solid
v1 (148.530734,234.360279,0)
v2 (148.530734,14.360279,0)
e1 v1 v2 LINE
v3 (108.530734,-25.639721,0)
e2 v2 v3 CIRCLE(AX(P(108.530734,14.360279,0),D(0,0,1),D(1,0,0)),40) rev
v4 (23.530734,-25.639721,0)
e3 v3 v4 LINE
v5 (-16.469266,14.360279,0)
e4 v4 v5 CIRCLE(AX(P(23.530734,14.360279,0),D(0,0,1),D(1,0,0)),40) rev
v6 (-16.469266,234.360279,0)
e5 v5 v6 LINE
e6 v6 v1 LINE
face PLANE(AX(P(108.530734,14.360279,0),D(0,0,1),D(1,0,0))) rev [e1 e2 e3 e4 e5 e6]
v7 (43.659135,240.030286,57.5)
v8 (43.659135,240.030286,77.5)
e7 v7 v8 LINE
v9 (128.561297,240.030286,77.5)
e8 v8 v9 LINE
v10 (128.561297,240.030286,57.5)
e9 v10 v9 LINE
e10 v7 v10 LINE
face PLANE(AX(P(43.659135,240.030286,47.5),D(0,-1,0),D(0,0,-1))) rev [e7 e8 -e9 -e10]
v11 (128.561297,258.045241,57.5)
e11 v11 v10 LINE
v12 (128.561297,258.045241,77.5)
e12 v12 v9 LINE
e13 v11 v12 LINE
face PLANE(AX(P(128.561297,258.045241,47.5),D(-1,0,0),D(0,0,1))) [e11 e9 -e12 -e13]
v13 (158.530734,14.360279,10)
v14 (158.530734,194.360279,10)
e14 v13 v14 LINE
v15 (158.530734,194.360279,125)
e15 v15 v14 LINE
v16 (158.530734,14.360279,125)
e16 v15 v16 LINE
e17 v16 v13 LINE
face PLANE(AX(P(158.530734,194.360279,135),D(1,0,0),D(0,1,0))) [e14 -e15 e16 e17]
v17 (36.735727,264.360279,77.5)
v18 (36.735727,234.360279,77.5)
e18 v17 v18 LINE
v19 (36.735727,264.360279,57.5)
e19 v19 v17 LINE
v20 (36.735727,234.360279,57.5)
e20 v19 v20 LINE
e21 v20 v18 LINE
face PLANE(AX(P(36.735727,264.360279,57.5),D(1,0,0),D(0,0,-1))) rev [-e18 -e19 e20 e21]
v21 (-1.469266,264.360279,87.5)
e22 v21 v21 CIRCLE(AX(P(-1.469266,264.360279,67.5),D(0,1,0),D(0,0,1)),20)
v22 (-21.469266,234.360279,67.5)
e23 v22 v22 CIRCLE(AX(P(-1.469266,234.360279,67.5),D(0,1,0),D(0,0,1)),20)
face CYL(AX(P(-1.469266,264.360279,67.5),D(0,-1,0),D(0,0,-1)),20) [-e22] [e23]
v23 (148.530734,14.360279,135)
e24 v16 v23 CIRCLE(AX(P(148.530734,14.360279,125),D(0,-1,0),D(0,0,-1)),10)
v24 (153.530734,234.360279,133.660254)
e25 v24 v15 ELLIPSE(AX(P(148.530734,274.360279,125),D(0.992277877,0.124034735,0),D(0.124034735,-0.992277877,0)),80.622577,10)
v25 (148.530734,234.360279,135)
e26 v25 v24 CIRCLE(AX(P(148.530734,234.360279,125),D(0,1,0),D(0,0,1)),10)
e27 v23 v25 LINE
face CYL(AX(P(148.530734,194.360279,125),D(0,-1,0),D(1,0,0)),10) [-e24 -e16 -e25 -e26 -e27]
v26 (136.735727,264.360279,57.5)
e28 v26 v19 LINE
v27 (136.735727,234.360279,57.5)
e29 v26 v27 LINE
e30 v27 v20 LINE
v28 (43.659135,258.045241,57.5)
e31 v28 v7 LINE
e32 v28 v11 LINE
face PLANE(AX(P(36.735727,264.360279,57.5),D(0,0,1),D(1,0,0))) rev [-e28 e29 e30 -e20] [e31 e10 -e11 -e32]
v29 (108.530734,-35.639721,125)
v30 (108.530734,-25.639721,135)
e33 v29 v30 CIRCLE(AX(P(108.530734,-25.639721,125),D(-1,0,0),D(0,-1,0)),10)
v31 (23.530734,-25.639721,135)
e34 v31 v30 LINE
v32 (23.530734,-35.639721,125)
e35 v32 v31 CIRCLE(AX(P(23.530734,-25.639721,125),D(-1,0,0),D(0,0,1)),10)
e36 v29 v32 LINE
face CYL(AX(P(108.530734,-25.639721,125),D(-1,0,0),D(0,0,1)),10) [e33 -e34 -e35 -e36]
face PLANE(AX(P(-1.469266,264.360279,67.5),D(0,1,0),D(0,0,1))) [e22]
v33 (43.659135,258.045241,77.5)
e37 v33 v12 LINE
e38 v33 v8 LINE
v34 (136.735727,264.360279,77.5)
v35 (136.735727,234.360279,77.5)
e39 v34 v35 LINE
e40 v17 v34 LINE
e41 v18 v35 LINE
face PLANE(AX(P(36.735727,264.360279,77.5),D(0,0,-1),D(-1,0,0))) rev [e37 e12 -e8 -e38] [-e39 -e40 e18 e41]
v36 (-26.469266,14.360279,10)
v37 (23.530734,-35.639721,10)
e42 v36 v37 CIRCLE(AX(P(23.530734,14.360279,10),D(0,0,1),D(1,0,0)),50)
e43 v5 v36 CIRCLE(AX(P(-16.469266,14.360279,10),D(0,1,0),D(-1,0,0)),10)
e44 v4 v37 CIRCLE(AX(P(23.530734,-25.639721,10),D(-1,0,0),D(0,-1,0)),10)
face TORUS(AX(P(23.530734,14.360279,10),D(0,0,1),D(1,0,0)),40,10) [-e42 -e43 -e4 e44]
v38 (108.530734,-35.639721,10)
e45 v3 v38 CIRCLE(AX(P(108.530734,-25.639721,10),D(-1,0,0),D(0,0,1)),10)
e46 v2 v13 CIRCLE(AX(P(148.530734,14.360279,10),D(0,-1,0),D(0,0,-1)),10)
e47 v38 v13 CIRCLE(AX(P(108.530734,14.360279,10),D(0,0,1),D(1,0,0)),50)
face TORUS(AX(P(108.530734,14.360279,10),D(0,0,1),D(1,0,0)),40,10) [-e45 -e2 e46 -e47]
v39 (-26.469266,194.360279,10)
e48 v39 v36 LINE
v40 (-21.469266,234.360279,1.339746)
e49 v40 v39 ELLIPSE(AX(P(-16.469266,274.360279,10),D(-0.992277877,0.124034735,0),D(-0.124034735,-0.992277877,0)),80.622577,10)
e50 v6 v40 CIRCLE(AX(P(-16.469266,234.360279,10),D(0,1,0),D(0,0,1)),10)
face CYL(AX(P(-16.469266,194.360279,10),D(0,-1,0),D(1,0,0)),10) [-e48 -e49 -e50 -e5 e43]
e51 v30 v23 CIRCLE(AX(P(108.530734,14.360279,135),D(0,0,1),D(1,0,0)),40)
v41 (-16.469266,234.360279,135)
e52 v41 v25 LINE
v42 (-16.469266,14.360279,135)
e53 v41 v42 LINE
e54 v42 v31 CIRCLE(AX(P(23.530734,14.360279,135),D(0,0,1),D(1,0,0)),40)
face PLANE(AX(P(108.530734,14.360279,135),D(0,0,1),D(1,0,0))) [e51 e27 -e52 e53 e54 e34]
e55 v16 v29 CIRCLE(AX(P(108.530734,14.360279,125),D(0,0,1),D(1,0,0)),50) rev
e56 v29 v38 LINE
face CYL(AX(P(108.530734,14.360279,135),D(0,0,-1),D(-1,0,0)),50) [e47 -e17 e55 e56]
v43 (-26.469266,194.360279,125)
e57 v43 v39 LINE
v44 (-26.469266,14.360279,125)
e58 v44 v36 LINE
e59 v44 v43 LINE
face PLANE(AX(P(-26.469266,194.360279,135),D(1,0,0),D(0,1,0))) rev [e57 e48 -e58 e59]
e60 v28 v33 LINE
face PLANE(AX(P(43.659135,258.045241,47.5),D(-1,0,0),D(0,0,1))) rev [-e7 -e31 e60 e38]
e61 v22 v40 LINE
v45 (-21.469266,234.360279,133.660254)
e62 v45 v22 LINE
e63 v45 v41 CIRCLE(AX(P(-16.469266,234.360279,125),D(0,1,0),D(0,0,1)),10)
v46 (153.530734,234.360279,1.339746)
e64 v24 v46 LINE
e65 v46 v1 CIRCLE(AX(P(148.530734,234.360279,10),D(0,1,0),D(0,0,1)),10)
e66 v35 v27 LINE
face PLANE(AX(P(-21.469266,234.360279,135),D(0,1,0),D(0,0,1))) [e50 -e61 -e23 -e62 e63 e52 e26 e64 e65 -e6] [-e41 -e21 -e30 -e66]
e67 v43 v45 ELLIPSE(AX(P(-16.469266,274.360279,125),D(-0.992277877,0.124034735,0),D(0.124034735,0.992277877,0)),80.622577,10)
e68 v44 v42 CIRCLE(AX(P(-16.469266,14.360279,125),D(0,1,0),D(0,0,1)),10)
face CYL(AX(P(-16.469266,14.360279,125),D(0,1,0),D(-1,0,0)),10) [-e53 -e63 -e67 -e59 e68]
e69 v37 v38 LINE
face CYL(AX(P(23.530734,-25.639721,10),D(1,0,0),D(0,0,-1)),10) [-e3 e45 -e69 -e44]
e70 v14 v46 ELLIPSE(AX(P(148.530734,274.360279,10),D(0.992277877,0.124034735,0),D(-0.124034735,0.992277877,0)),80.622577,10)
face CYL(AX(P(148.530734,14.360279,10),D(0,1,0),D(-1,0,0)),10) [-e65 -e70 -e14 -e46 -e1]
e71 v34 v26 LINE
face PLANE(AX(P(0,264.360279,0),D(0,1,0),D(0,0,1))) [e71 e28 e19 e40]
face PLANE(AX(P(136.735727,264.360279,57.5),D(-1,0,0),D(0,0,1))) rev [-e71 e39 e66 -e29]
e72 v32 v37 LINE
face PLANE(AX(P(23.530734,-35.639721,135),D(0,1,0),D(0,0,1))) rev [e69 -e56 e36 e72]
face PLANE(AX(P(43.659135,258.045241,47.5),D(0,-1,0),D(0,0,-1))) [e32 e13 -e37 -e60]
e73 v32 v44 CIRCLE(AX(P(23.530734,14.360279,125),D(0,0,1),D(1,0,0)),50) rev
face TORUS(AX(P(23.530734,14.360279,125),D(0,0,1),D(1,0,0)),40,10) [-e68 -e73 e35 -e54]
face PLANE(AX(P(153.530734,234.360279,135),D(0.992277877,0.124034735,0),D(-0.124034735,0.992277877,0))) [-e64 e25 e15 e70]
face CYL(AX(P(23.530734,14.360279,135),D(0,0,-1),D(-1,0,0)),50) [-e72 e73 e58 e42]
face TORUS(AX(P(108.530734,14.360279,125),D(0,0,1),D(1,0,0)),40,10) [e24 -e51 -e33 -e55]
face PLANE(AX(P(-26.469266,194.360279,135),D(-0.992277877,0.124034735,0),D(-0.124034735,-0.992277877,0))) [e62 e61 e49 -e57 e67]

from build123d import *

# Parameters (mm, degrees)
BOSS_EXTRUDE2_DEPTH = 135
SKETCH2_R           = 20
SKETCH2_W           = 100
SKETCH2_H           = 20
BOSS_EXTRUDE3_DEPTH = 30
SKETCH3_W           = 84.902161113
SKETCH3_H           = 18.014954353
CUT_EXTRUDE1_DEPTH  = 30
FILLET1_R           = 10
FILLET2_R           = 10


with BuildPart() as part:
    # Sketch1 → Boss-Extrude2 (new body)
    with BuildSketch(Plane.XY):
        with BuildLine():
            Line((-21.469266172, 234.360279406), (153.530733828, 234.360279406))
            Line((153.530733828, 234.360279406), (158.530733828, 194.360279406))
            Line((158.530733828, 194.360279406), (158.530733828, 14.360279406))
            ThreePointArc((158.530733828, 14.360279406), (143.886072887, -20.995059653), (108.530733828, -35.639720594))
            Line((108.530733828, -35.639720594), (23.530733828, -35.639720594))
            ThreePointArc((23.530733828, -35.639720594), (-11.824605232, -20.995059653), (-26.469266172, 14.360279406))
            Line((-26.469266172, 14.360279406), (-26.469266172, 194.360279406))
            Line((-26.469266172, 194.360279406), (-21.469266172, 234.360279406))
        make_face()
    extrude(amount=BOSS_EXTRUDE2_DEPTH)

    # Sketch2 → Boss-Extrude3 (add)
    with BuildSketch(Plane(origin=(0, 234.360279406, 0), x_dir=(1, 0, 0), z_dir=(0, 1, 0))):
        with Locations(Location((-1.469266172, -67.5, 0), (0, 0, 180))):
            Circle(SKETCH2_R)
        with Locations((86.735726722, -67.5)):
            Rectangle(SKETCH2_W, SKETCH2_H)
    extrude(amount=BOSS_EXTRUDE3_DEPTH)

    # Sketch3 → Cut-Extrude1 (cut)
    with BuildSketch(Plane.XY.offset(77.5)):
        with Locations((86.110215993, 249.037763676)):
            Rectangle(SKETCH3_W, SKETCH3_H)
    extrude(amount=-CUT_EXTRUDE1_DEPTH, mode=Mode.SUBTRACT)

    # Fillet1
    fillet1_edges = [part.edges().sort_by_distance(p)[0] for p in [
        (158.530733828, 104.360279406, 135),
        (143.886072887, -20.995059653, 135),
        (66.030733828, -35.639720594, 135),
        (-11.824605232, -20.995059653, 135),
        (-26.469266172, 104.360279406, 135),
    ]]
    fillet(fillet1_edges, radius=FILLET1_R)

    # Fillet2
    # the kernel refuses this fillet: 10 mm, written as the material it takes off along each edge
    with BuildSketch(Plane(origin=(-26.469266172, 14.360279406, 0), x_dir=(0, 0, 1), z_dir=(0, 1, 0))) as fillet2_piece_1:
        with BuildLine():
            CenterArc((FILLET2_R, FILLET2_R), FILLET2_R, 180, 90)
            Line((0, FILLET2_R), (-FILLET2_R * 0.02, FILLET2_R))
            Line((-FILLET2_R * 0.02, FILLET2_R), (-FILLET2_R * 0.02, -FILLET2_R * 0.02))
            Line((-FILLET2_R * 0.02, -FILLET2_R * 0.02), (FILLET2_R, -FILLET2_R * 0.02))
            Line((FILLET2_R, -FILLET2_R * 0.02), (FILLET2_R, 0))
        make_face()
    extrude(amount=240, mode=Mode.SUBTRACT)
    with BuildSketch(Plane(origin=(23.530733828, 14.360279406, 0), x_dir=(0, -1, 0), z_dir=(1, 0, 0))) as fillet2_piece_2:
        with BuildLine():
            CenterArc((50 - FILLET2_R, -FILLET2_R), FILLET2_R, 0, 90)
            Line((50 - FILLET2_R, 0), (50 - FILLET2_R, FILLET2_R * 0.02))
            Line((50 - FILLET2_R, FILLET2_R * 0.02), (50 + FILLET2_R * 0.02, FILLET2_R * 0.02))
            Line((50 + FILLET2_R * 0.02, FILLET2_R * 0.02), (50 + FILLET2_R * 0.02, -FILLET2_R))
            Line((50 + FILLET2_R * 0.02, -FILLET2_R), (50, -FILLET2_R))
        make_face()
    revolve(axis=Axis((23.530733828, 14.360279406, 0), (0, 0, -1)), revolution_arc=90, mode=Mode.SUBTRACT)
    with BuildSketch(Plane(origin=(108.530733828, -35.639720594, 0), x_dir=(0, 1, 0), z_dir=(-1, 0, 0))) as fillet2_piece_3:
        with BuildLine():
            CenterArc((FILLET2_R, -FILLET2_R), FILLET2_R, 90, 90)
            Line((0, -FILLET2_R), (-FILLET2_R * 0.02, -FILLET2_R))
            Line((-FILLET2_R * 0.02, -FILLET2_R), (-FILLET2_R * 0.02, FILLET2_R * 0.02))
            Line((-FILLET2_R * 0.02, FILLET2_R * 0.02), (FILLET2_R, FILLET2_R * 0.02))
            Line((FILLET2_R, FILLET2_R * 0.02), (FILLET2_R, 0))
        make_face()
    extrude(amount=85, mode=Mode.SUBTRACT)
    with BuildSketch(Plane(origin=(108.530733828, 14.360279406, 0), x_dir=(1, 0, 0), z_dir=(0, 1, 0))) as fillet2_piece_4:
        with BuildLine():
            CenterArc((50 - FILLET2_R, -FILLET2_R), FILLET2_R, 0, 90)
            Line((50, -FILLET2_R), (50 + FILLET2_R * 0.02, -FILLET2_R))
            Line((50 + FILLET2_R * 0.02, -FILLET2_R), (50 + FILLET2_R * 0.02, FILLET2_R * 0.02))
            Line((50 + FILLET2_R * 0.02, FILLET2_R * 0.02), (50 - FILLET2_R, FILLET2_R * 0.02))
            Line((50 - FILLET2_R, FILLET2_R * 0.02), (50 - FILLET2_R, 0))
        make_face()
    revolve(axis=Axis((108.530733828, 14.360279406, 0), (0, 0, -1)), revolution_arc=90, mode=Mode.SUBTRACT)
    with BuildSketch(Plane(origin=(158.530733828, 254.360279406, 0), x_dir=(-1, 0, 0), z_dir=(0, -1, 0))) as fillet2_piece_5:
        with BuildLine():
            CenterArc((FILLET2_R, -FILLET2_R), FILLET2_R, 90, 90)
            Line((0, -FILLET2_R), (-FILLET2_R * 0.02, -FILLET2_R))
            Line((-FILLET2_R * 0.02, -FILLET2_R), (-FILLET2_R * 0.02, FILLET2_R * 0.02))
            Line((-FILLET2_R * 0.02, FILLET2_R * 0.02), (FILLET2_R, FILLET2_R * 0.02))
            Line((FILLET2_R, FILLET2_R * 0.02), (FILLET2_R, 0))
        make_face()
    extrude(amount=240, mode=Mode.SUBTRACT)


solid = part.part
